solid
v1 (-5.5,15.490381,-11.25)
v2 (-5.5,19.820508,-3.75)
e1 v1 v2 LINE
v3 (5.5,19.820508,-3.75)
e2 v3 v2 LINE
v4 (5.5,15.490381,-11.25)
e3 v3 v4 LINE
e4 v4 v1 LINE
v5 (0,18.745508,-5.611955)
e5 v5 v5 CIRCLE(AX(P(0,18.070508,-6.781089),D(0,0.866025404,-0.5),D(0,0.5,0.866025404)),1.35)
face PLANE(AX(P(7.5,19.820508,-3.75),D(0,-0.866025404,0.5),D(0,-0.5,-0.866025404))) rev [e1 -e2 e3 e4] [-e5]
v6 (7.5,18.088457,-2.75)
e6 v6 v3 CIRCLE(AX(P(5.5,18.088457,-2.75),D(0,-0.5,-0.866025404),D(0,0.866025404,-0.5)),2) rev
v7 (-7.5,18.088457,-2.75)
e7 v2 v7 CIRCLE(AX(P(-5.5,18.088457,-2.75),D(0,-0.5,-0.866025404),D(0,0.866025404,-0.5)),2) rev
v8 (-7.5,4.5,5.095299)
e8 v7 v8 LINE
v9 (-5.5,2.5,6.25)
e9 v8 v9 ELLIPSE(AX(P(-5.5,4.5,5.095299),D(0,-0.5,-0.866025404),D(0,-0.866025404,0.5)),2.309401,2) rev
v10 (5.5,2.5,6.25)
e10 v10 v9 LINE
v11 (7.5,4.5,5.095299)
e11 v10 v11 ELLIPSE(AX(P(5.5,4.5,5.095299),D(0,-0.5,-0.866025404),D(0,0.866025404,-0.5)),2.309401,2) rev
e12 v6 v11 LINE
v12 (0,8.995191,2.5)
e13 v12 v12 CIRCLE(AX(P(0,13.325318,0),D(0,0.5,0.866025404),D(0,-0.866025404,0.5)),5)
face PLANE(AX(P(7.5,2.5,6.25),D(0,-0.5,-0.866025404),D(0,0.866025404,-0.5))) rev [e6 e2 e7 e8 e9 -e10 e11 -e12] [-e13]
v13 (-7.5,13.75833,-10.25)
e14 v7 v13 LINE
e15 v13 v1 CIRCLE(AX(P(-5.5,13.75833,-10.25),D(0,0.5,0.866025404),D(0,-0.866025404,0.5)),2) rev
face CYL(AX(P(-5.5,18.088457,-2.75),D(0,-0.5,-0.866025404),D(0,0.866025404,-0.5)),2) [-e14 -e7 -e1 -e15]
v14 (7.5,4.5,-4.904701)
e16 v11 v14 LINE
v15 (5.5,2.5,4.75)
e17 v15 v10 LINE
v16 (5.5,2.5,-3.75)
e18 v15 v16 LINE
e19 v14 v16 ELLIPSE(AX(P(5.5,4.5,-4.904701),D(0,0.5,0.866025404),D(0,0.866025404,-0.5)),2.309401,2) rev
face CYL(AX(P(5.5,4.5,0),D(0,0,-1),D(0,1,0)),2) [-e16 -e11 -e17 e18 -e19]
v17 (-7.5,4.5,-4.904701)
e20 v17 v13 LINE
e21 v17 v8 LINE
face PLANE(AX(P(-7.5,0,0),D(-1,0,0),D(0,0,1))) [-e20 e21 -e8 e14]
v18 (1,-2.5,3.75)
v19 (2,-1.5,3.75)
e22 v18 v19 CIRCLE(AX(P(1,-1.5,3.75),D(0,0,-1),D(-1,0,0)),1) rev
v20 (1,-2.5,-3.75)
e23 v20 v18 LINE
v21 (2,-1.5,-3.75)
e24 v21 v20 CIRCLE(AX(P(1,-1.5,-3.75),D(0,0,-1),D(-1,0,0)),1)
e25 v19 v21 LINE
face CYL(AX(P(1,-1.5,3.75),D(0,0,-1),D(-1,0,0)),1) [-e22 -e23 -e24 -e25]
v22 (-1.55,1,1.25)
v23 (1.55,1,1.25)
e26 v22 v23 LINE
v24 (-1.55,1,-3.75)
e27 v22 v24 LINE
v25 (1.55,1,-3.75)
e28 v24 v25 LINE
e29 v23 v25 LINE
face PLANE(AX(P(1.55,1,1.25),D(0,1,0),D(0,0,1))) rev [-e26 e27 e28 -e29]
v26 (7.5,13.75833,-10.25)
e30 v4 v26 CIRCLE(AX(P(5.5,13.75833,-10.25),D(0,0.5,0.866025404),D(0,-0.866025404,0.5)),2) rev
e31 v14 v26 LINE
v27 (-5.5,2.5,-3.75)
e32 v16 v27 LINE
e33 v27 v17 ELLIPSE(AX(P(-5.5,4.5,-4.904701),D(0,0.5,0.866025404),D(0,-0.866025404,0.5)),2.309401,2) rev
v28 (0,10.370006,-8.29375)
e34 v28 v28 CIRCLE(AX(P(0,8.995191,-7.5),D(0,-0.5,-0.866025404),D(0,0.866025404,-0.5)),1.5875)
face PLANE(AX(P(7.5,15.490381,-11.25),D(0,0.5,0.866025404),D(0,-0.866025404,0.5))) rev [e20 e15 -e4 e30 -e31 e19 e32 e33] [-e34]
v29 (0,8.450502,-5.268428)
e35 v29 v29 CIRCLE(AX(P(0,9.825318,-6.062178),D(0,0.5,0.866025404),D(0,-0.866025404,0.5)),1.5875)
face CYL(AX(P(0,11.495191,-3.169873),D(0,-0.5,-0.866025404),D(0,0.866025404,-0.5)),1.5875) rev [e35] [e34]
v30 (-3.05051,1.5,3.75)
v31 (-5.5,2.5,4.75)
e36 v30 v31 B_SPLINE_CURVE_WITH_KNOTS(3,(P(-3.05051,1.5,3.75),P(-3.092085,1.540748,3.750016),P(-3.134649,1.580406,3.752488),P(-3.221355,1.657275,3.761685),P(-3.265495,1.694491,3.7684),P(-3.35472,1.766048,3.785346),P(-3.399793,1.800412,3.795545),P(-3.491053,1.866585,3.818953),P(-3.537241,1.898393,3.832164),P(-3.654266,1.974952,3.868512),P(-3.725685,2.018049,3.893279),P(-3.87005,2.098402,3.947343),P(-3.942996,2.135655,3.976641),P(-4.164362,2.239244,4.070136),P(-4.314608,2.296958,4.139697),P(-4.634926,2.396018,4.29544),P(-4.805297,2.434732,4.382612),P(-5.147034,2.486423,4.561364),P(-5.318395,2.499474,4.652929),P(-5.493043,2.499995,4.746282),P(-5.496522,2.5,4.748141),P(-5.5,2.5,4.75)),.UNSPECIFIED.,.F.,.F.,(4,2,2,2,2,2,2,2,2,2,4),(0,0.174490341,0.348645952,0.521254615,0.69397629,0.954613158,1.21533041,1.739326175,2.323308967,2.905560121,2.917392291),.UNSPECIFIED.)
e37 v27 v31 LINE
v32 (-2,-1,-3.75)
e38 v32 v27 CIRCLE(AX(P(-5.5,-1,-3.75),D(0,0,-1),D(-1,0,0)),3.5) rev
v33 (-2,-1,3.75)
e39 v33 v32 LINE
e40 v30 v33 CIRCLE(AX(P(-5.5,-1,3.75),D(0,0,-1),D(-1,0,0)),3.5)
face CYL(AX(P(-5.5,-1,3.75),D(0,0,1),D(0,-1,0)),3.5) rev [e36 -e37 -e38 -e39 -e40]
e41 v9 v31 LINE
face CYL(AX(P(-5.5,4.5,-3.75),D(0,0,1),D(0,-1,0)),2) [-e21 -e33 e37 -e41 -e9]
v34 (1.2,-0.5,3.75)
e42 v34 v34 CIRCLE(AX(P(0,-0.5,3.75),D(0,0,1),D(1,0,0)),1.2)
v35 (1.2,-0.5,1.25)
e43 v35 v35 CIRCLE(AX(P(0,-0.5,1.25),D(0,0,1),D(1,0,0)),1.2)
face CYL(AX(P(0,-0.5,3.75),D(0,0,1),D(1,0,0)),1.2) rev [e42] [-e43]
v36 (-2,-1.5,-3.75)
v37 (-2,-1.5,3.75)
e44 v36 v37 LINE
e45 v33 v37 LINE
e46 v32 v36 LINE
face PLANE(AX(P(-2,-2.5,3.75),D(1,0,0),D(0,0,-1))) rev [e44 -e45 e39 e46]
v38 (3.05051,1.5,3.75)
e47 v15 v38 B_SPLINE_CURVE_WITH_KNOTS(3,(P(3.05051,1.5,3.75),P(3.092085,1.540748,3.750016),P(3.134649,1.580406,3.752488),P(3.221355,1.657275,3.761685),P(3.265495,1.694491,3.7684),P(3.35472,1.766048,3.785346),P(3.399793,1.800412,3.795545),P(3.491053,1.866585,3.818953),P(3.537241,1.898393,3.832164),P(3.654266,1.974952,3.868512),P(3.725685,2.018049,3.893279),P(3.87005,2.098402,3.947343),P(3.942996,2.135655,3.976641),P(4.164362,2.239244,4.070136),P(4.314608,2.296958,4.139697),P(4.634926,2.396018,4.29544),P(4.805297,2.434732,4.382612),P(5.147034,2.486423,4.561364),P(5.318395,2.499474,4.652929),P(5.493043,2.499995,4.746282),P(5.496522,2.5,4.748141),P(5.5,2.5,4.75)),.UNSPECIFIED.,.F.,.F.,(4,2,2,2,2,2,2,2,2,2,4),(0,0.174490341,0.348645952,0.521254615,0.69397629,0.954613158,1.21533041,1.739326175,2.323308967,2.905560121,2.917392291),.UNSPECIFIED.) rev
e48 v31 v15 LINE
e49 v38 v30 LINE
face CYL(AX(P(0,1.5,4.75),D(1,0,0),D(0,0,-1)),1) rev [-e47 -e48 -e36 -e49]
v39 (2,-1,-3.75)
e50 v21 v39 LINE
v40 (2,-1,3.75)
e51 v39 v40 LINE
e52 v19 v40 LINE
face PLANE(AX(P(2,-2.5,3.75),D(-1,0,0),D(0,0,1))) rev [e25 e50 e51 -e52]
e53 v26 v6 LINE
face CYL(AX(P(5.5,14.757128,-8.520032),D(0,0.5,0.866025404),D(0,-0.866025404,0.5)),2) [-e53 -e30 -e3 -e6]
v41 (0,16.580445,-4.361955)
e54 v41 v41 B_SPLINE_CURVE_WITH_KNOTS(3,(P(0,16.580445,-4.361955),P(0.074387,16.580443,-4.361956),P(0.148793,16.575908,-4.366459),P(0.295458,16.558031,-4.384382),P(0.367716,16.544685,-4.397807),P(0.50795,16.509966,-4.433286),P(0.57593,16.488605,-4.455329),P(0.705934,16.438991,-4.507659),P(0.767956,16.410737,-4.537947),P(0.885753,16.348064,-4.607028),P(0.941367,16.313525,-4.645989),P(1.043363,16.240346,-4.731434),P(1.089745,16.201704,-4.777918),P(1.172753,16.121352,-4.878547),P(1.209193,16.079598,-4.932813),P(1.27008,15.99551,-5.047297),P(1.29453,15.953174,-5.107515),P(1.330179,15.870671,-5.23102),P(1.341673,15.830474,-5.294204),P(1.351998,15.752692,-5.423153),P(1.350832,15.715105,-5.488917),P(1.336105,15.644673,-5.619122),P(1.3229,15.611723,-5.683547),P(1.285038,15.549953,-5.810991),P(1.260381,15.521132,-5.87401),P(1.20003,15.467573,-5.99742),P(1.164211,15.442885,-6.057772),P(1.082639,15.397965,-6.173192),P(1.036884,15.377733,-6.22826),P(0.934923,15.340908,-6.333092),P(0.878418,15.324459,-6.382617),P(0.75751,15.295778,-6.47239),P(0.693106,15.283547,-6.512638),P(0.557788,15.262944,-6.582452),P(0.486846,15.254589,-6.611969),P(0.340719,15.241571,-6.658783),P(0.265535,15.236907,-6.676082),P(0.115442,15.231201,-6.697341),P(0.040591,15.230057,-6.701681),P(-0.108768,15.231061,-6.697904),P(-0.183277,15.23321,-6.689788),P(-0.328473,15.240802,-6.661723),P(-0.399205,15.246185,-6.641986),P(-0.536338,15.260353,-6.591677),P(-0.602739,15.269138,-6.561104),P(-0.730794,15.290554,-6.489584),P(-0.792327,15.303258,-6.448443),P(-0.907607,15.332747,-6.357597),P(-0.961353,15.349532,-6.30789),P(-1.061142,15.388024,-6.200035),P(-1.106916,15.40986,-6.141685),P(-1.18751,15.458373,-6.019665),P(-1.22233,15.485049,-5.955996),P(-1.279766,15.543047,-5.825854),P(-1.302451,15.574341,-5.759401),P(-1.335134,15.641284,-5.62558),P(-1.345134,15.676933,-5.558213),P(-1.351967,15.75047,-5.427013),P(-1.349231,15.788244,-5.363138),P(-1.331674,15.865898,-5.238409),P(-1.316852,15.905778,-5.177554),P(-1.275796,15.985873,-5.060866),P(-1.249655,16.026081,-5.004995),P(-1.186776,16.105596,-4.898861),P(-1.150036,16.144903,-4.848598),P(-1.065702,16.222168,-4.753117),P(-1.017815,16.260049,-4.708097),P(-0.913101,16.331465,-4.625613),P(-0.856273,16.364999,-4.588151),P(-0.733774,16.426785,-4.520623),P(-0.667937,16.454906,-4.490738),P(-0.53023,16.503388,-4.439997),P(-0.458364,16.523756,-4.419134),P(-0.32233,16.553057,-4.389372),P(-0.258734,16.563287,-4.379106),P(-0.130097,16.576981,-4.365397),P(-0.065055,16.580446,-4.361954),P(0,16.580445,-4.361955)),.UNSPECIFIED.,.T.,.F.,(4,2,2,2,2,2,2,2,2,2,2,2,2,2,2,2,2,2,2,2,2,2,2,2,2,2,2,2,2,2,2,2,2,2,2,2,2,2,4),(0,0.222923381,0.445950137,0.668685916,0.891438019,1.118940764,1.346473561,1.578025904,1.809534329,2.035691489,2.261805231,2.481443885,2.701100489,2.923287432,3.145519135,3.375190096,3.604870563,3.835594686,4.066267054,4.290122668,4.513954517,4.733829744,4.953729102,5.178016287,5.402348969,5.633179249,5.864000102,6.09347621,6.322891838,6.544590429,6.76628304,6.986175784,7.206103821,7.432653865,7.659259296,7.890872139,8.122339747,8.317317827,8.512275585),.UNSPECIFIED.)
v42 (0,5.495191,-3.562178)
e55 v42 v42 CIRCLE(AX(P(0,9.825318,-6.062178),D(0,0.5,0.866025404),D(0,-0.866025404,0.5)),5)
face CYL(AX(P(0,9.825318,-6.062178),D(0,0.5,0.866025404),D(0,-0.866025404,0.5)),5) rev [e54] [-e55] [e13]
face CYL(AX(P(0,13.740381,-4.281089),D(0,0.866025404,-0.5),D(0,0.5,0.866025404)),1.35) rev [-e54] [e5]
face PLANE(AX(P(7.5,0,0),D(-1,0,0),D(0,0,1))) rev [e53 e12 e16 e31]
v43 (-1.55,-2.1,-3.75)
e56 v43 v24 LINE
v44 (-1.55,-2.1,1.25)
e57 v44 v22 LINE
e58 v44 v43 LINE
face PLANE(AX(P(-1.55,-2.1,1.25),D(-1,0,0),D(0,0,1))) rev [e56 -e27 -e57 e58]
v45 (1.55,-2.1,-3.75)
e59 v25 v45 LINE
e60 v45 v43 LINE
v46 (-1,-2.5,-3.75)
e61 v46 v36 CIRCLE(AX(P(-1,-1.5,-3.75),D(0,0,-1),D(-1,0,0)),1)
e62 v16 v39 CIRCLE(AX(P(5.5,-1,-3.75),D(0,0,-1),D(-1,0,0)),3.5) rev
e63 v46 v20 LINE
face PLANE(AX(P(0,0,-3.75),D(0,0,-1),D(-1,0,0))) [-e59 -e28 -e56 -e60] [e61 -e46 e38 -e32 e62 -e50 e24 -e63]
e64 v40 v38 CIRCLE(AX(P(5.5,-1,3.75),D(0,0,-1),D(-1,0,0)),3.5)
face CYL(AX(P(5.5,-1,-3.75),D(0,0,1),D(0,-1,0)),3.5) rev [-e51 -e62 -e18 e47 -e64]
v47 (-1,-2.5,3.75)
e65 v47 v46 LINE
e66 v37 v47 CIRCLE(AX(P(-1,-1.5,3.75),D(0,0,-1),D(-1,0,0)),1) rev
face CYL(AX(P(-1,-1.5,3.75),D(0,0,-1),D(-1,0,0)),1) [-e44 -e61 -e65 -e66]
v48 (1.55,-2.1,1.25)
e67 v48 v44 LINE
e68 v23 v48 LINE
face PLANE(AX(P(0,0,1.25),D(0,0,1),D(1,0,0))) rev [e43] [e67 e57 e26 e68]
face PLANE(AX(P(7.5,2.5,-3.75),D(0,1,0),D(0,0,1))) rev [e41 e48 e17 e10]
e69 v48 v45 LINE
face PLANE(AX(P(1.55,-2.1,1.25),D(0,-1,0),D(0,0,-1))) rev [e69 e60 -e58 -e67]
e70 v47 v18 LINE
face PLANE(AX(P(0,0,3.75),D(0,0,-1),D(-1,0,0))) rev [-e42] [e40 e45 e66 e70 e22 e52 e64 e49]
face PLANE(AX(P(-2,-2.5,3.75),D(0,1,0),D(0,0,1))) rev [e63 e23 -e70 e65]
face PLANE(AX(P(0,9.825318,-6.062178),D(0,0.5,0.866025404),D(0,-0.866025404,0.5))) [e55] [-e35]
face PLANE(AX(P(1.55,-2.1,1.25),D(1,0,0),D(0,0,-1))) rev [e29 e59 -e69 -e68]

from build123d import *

# Parameters (mm, degrees)
SKETCH1_W            = 4
SKETCH1_H            = 5
BOSS_EXTRUDE1_DEPTH  = 3.75
SKETCH2_W            = 3.1
SKETCH2_H            = 3.1
CUT_EXTRUDE1_DEPTH   = 5
BOSS_EXTRUDE2_DEPTH  = 7.5
M2_CLEARANCE_HOLE1_D = 2.4
FILLET1_R            = 3.5
FILLET2_R            = 2
FILLET3_R            = 1
SKETCH17_R           = 5
CUT_EXTRUDE2_DEPTH   = 7
SKETCH5_R            = 1.5875
CUT_EXTRUDE3_DEPTH   = 5
FILLET4_R            = 1
SKETCH18_R           = 1.35
CUT_EXTRUDE4_DEPTH   = 5


with BuildPart() as part:
    # Sketch1 → Boss-Extrude1 (new, symmetric)
    with BuildSketch(Plane.XY):
        Rectangle(SKETCH1_W, SKETCH1_H)
    extrude(amount=BOSS_EXTRUDE1_DEPTH, both=True)

    # Sketch2 → Cut-Extrude1 (cut)
    with BuildSketch(Plane(origin=(0, 0, -3.75), x_dir=(-1, 0, 0), z_dir=(0, 0, -1))):
        with Locations((0, -0.55)):
            Rectangle(SKETCH2_W, SKETCH2_H)
    extrude(amount=-CUT_EXTRUDE1_DEPTH, mode=Mode.SUBTRACT)

    # Sketch3 → Boss-Extrude2 (add, symmetric)
    with BuildSketch(Plane(origin=(0, 0, 0), x_dir=(0, 0, -1), z_dir=(1, 0, 0))):
        Polygon((-6.25, 2.5), (3.75, 19.820508076), (11.25, 15.490381057), (3.75, 2.5), align=None)
    extrude(amount=BOSS_EXTRUDE2_DEPTH, both=True)

    # M2 Clearance Hole1 (through all)
    with Locations(Plane.XY.offset(3.75)):
        with Locations((0, -0.5)):
            Hole(M2_CLEARANCE_HOLE1_D / 2)

    # Fillet1
    fillet1_edges = [part.edges().sort_by_distance(p)[0] for p in [
        (-2, 2.5, 0),
        (2, 2.5, 0),
    ]]
    fillet(fillet1_edges, radius=FILLET1_R)

    # Fillet2
    fillet2_edges = [part.edges().sort_by_distance(p)[0] for p in [
        (-7.5, 17.655444566, -7.5),
        (7.5, 17.655444566, -7.5),
        (7.5, 2.5, 1.25),
        (-7.5, 2.5, 1.25),
    ]]
    fillet(fillet2_edges, radius=FILLET2_R - 0.0001)  # a hair under: the kernel refuses the full size

    # Fillet3
    fillet3_edges = [part.edges().sort_by_distance(p)[0] for p in [
        (2, -2.5, 0),
        (-2, -2.5, 0),
    ]]
    fillet(fillet3_edges, radius=FILLET3_R)

    # Sketch17 → Cut-Extrude2 (cut)
    with BuildSketch(Plane(origin=(0, 3.331329387, 5.770031755), x_dir=(1, 0, 0), z_dir=(0, 0.5000000000000039, 0.8660254037844365))):
        with Locations(Location((0, 11.540063509, 0), (0, 0, 270))):
            Circle(SKETCH17_R)
    extrude(amount=-CUT_EXTRUDE2_DEPTH, mode=Mode.SUBTRACT)

    # Sketch5 → Cut-Extrude3 (cut)
    with BuildSketch(Plane(origin=(0, -0.998797632, -1.729968245), x_dir=(-1, 0, 0), z_dir=(0, -0.5000000000000038, -0.8660254037844366))):
        with Locations(Location((0, 11.540063509, 0), (0, 0, 90))):
            Circle(SKETCH5_R)
    extrude(amount=-CUT_EXTRUDE3_DEPTH, mode=Mode.SUBTRACT)

    # Fillet4
    fillet4_edges = [part.edges().sort_by_distance(p)[0] for p in [
        (0, 2.5, 3.75),
    ]]
    fillet(fillet4_edges, radius=FILLET4_R)

    # Sketch18 → Cut-Extrude4 (cut)
    with BuildSketch(Plane(origin=(0, 16.489178689, -9.520031755), x_dir=(1, 0, 0), z_dir=(0, 0.8660254037844366, -0.5000000000000038))):
        with Locations(Location((0, -3.162658774, 0), (0, 0, 270))):
            Circle(SKETCH18_R)
    extrude(amount=-CUT_EXTRUDE4_DEPTH, mode=Mode.SUBTRACT)


solid = part.part
